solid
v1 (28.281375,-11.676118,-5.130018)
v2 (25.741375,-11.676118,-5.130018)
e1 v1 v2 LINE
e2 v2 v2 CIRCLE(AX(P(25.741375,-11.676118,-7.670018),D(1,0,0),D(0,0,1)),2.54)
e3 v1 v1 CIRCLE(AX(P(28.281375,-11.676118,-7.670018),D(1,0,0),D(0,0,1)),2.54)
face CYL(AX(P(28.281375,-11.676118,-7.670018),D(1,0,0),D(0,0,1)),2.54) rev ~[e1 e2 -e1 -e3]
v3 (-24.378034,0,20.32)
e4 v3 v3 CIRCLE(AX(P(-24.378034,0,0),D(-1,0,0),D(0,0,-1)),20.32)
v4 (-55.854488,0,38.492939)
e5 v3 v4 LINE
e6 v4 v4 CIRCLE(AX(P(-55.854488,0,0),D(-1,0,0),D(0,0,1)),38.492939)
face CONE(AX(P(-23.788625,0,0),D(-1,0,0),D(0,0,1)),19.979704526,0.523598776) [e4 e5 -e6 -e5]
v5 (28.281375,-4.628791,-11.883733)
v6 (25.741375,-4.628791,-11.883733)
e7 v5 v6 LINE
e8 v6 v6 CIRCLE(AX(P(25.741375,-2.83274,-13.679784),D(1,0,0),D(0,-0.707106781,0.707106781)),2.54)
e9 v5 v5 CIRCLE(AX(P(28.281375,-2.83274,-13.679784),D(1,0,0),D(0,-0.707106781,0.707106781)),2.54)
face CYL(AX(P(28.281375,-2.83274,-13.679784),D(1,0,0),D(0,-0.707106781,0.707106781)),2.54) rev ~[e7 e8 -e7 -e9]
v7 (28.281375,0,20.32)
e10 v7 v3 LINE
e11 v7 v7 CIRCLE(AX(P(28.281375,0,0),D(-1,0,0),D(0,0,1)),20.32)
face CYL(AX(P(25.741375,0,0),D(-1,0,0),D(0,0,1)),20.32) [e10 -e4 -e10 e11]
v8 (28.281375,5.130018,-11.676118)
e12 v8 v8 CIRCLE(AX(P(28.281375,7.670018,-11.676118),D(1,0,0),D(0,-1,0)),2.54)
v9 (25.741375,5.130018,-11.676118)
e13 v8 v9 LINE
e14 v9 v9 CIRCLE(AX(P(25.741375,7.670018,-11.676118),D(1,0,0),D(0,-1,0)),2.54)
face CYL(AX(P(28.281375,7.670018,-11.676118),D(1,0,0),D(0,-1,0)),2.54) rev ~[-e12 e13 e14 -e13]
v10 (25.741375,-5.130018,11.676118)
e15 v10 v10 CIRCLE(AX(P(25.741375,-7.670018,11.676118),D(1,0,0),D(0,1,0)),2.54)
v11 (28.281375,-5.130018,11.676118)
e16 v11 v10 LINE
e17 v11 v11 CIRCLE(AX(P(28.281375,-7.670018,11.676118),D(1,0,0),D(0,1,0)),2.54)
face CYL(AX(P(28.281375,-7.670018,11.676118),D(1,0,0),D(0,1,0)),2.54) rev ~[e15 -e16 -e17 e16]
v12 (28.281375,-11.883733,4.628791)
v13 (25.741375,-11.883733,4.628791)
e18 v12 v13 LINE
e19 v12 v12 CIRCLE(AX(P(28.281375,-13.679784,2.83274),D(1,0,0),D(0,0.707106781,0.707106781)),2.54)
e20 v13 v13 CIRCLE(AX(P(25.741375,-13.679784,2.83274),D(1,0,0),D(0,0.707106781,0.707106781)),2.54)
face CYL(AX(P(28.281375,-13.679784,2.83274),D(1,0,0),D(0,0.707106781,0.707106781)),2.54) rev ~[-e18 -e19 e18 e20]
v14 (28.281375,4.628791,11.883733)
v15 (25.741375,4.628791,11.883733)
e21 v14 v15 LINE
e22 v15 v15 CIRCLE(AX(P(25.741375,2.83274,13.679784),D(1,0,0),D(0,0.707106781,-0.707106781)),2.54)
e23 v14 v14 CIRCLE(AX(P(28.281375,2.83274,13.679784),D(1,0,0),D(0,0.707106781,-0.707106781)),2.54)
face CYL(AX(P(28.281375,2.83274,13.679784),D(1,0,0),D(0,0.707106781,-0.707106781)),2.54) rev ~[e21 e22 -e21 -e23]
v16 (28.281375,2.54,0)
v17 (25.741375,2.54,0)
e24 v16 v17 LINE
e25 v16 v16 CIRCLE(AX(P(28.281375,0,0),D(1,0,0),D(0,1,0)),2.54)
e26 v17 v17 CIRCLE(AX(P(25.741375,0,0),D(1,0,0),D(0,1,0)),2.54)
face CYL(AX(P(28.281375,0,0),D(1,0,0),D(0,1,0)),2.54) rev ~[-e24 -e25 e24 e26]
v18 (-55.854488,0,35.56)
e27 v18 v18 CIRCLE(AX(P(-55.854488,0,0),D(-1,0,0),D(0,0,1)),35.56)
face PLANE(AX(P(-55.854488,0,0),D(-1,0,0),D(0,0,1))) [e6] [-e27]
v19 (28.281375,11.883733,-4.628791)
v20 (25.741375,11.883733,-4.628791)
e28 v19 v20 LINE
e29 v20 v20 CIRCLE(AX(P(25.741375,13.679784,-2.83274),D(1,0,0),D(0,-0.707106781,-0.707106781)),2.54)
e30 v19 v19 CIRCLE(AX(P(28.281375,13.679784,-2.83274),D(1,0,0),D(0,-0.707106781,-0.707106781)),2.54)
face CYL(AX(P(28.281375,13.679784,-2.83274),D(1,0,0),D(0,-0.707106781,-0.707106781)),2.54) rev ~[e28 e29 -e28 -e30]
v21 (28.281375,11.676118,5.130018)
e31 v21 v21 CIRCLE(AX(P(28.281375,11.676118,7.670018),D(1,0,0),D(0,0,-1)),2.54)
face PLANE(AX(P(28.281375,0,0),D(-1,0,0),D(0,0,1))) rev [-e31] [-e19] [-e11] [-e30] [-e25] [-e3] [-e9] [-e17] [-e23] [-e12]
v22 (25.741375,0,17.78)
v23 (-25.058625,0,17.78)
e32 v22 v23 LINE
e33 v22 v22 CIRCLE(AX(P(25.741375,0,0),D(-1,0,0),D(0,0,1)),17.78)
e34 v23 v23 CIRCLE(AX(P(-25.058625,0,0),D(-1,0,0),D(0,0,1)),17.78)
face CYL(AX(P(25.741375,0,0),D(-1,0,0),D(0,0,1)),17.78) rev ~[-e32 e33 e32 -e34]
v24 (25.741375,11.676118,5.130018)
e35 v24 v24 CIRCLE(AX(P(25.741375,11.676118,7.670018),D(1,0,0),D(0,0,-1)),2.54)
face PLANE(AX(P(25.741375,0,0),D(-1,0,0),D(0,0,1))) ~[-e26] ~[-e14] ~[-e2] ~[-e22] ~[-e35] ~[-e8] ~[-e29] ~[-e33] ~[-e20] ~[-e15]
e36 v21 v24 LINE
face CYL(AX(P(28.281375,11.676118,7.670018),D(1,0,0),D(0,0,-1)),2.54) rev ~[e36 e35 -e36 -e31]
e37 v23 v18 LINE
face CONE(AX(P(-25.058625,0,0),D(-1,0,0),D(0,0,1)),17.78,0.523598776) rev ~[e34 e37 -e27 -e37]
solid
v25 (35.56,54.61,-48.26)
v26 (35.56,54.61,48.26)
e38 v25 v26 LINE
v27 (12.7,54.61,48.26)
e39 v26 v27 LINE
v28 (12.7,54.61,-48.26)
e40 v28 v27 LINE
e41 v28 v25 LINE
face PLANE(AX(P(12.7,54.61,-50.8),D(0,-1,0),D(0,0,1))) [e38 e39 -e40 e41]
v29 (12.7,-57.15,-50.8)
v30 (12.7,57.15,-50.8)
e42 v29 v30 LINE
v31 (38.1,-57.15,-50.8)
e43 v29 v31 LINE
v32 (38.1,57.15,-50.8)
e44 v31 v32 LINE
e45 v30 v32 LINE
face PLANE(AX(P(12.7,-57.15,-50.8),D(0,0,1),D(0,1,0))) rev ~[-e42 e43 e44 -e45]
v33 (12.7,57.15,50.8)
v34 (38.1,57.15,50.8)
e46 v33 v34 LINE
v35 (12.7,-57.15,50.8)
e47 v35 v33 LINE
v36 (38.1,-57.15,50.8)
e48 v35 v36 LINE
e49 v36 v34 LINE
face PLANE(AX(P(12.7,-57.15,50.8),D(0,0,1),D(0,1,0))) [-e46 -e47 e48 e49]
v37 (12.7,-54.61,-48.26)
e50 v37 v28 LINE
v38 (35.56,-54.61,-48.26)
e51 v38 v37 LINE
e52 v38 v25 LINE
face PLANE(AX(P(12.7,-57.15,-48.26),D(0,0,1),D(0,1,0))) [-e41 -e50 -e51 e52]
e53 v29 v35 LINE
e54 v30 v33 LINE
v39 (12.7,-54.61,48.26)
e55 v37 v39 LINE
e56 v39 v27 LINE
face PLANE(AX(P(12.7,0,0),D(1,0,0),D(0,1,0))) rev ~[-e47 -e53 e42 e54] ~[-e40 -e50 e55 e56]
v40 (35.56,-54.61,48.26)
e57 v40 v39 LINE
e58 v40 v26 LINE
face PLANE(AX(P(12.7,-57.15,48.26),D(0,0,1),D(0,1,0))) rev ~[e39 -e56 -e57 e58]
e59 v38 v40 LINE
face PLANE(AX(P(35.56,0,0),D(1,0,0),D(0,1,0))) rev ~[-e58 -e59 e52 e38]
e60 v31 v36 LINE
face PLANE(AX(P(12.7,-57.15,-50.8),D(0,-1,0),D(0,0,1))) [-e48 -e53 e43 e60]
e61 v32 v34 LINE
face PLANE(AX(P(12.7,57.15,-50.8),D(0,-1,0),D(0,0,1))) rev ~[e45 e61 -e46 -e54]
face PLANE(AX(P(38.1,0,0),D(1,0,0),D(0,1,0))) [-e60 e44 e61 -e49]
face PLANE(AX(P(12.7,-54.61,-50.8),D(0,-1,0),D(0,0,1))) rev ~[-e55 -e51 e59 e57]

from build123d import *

# Parameters (mm, degrees)
F2_T            = 2.54
F3_R            = 2.54
F4_DEPTH        = 25.4
F4_COPIES_COUNT = 8
F5_R            = 2.54
F6_DEPTH        = 25.4
F8_W            = 114.3
F8_H            = 101.6
F9_DEPTH        = 25.4
F10_T           = -2.54


# Not quite as in the source:
# - a pattern or mirror of a feature is missing from the dataset's text; its kind, count and spacing are read off the source's solid


with BuildPart() as f1:
    # F0 (on Front) → F1 (revolve)
    with BuildSketch(Plane.XZ):
        Polygon((-25.0586248056, 17.78), (-55.8544881642, 35.56), (-55.8544881642, 0), (25.7413751944, 0), (25.7413751944, 17.78), align=None)
    revolve(axis=Axis((-15.0565564849, 0, 0), (-1, 0, 0)))

    # F2
    f2_openings = [f1.faces().sort_by_distance(p)[0] for p in [
        (-55.854488, 0, 0),
    ]]
    offset(amount=F2_T, openings=f2_openings, kind=Kind.INTERSECTION)

    # F3 (on face) → F4 (cut)
    with BuildSketch(Plane.YZ.offset(28.2813751944)):
        with Locations((-7.6700180371, 11.6761176472)):
            Circle(F3_R)
    f4 = extrude(amount=-F4_DEPTH, mode=Mode.SUBTRACT)

    # F4_copies: F4 ×8 about axis
    f4_copies_axis = Axis((0, 0, 0), (1, 0, 0))
    for i in range(1, F4_COPIES_COUNT):
        add(f4.rotate(f4_copies_axis, i * 360 / F4_COPIES_COUNT), mode=Mode.SUBTRACT)

    # F5 (on face) → F6 (cut)
    with BuildSketch(Plane.YZ.offset(28.2813751944)):
        Circle(F5_R)
    extrude(amount=-F6_DEPTH, mode=Mode.SUBTRACT)


with BuildPart() as f9:
    # F8 (on offset) → F9 (new body)
    with BuildSketch(Plane.YZ.offset(12.7)):
        Rectangle(F8_W, F8_H)
    extrude(amount=F9_DEPTH)

    # F10
    f10_openings = [f9.faces().sort_by_distance(p)[0] for p in [
        (12.7, 0, 0),
    ]]
    offset(amount=F10_T, openings=f10_openings)


solid = Compound([f1.part, f9.part])
